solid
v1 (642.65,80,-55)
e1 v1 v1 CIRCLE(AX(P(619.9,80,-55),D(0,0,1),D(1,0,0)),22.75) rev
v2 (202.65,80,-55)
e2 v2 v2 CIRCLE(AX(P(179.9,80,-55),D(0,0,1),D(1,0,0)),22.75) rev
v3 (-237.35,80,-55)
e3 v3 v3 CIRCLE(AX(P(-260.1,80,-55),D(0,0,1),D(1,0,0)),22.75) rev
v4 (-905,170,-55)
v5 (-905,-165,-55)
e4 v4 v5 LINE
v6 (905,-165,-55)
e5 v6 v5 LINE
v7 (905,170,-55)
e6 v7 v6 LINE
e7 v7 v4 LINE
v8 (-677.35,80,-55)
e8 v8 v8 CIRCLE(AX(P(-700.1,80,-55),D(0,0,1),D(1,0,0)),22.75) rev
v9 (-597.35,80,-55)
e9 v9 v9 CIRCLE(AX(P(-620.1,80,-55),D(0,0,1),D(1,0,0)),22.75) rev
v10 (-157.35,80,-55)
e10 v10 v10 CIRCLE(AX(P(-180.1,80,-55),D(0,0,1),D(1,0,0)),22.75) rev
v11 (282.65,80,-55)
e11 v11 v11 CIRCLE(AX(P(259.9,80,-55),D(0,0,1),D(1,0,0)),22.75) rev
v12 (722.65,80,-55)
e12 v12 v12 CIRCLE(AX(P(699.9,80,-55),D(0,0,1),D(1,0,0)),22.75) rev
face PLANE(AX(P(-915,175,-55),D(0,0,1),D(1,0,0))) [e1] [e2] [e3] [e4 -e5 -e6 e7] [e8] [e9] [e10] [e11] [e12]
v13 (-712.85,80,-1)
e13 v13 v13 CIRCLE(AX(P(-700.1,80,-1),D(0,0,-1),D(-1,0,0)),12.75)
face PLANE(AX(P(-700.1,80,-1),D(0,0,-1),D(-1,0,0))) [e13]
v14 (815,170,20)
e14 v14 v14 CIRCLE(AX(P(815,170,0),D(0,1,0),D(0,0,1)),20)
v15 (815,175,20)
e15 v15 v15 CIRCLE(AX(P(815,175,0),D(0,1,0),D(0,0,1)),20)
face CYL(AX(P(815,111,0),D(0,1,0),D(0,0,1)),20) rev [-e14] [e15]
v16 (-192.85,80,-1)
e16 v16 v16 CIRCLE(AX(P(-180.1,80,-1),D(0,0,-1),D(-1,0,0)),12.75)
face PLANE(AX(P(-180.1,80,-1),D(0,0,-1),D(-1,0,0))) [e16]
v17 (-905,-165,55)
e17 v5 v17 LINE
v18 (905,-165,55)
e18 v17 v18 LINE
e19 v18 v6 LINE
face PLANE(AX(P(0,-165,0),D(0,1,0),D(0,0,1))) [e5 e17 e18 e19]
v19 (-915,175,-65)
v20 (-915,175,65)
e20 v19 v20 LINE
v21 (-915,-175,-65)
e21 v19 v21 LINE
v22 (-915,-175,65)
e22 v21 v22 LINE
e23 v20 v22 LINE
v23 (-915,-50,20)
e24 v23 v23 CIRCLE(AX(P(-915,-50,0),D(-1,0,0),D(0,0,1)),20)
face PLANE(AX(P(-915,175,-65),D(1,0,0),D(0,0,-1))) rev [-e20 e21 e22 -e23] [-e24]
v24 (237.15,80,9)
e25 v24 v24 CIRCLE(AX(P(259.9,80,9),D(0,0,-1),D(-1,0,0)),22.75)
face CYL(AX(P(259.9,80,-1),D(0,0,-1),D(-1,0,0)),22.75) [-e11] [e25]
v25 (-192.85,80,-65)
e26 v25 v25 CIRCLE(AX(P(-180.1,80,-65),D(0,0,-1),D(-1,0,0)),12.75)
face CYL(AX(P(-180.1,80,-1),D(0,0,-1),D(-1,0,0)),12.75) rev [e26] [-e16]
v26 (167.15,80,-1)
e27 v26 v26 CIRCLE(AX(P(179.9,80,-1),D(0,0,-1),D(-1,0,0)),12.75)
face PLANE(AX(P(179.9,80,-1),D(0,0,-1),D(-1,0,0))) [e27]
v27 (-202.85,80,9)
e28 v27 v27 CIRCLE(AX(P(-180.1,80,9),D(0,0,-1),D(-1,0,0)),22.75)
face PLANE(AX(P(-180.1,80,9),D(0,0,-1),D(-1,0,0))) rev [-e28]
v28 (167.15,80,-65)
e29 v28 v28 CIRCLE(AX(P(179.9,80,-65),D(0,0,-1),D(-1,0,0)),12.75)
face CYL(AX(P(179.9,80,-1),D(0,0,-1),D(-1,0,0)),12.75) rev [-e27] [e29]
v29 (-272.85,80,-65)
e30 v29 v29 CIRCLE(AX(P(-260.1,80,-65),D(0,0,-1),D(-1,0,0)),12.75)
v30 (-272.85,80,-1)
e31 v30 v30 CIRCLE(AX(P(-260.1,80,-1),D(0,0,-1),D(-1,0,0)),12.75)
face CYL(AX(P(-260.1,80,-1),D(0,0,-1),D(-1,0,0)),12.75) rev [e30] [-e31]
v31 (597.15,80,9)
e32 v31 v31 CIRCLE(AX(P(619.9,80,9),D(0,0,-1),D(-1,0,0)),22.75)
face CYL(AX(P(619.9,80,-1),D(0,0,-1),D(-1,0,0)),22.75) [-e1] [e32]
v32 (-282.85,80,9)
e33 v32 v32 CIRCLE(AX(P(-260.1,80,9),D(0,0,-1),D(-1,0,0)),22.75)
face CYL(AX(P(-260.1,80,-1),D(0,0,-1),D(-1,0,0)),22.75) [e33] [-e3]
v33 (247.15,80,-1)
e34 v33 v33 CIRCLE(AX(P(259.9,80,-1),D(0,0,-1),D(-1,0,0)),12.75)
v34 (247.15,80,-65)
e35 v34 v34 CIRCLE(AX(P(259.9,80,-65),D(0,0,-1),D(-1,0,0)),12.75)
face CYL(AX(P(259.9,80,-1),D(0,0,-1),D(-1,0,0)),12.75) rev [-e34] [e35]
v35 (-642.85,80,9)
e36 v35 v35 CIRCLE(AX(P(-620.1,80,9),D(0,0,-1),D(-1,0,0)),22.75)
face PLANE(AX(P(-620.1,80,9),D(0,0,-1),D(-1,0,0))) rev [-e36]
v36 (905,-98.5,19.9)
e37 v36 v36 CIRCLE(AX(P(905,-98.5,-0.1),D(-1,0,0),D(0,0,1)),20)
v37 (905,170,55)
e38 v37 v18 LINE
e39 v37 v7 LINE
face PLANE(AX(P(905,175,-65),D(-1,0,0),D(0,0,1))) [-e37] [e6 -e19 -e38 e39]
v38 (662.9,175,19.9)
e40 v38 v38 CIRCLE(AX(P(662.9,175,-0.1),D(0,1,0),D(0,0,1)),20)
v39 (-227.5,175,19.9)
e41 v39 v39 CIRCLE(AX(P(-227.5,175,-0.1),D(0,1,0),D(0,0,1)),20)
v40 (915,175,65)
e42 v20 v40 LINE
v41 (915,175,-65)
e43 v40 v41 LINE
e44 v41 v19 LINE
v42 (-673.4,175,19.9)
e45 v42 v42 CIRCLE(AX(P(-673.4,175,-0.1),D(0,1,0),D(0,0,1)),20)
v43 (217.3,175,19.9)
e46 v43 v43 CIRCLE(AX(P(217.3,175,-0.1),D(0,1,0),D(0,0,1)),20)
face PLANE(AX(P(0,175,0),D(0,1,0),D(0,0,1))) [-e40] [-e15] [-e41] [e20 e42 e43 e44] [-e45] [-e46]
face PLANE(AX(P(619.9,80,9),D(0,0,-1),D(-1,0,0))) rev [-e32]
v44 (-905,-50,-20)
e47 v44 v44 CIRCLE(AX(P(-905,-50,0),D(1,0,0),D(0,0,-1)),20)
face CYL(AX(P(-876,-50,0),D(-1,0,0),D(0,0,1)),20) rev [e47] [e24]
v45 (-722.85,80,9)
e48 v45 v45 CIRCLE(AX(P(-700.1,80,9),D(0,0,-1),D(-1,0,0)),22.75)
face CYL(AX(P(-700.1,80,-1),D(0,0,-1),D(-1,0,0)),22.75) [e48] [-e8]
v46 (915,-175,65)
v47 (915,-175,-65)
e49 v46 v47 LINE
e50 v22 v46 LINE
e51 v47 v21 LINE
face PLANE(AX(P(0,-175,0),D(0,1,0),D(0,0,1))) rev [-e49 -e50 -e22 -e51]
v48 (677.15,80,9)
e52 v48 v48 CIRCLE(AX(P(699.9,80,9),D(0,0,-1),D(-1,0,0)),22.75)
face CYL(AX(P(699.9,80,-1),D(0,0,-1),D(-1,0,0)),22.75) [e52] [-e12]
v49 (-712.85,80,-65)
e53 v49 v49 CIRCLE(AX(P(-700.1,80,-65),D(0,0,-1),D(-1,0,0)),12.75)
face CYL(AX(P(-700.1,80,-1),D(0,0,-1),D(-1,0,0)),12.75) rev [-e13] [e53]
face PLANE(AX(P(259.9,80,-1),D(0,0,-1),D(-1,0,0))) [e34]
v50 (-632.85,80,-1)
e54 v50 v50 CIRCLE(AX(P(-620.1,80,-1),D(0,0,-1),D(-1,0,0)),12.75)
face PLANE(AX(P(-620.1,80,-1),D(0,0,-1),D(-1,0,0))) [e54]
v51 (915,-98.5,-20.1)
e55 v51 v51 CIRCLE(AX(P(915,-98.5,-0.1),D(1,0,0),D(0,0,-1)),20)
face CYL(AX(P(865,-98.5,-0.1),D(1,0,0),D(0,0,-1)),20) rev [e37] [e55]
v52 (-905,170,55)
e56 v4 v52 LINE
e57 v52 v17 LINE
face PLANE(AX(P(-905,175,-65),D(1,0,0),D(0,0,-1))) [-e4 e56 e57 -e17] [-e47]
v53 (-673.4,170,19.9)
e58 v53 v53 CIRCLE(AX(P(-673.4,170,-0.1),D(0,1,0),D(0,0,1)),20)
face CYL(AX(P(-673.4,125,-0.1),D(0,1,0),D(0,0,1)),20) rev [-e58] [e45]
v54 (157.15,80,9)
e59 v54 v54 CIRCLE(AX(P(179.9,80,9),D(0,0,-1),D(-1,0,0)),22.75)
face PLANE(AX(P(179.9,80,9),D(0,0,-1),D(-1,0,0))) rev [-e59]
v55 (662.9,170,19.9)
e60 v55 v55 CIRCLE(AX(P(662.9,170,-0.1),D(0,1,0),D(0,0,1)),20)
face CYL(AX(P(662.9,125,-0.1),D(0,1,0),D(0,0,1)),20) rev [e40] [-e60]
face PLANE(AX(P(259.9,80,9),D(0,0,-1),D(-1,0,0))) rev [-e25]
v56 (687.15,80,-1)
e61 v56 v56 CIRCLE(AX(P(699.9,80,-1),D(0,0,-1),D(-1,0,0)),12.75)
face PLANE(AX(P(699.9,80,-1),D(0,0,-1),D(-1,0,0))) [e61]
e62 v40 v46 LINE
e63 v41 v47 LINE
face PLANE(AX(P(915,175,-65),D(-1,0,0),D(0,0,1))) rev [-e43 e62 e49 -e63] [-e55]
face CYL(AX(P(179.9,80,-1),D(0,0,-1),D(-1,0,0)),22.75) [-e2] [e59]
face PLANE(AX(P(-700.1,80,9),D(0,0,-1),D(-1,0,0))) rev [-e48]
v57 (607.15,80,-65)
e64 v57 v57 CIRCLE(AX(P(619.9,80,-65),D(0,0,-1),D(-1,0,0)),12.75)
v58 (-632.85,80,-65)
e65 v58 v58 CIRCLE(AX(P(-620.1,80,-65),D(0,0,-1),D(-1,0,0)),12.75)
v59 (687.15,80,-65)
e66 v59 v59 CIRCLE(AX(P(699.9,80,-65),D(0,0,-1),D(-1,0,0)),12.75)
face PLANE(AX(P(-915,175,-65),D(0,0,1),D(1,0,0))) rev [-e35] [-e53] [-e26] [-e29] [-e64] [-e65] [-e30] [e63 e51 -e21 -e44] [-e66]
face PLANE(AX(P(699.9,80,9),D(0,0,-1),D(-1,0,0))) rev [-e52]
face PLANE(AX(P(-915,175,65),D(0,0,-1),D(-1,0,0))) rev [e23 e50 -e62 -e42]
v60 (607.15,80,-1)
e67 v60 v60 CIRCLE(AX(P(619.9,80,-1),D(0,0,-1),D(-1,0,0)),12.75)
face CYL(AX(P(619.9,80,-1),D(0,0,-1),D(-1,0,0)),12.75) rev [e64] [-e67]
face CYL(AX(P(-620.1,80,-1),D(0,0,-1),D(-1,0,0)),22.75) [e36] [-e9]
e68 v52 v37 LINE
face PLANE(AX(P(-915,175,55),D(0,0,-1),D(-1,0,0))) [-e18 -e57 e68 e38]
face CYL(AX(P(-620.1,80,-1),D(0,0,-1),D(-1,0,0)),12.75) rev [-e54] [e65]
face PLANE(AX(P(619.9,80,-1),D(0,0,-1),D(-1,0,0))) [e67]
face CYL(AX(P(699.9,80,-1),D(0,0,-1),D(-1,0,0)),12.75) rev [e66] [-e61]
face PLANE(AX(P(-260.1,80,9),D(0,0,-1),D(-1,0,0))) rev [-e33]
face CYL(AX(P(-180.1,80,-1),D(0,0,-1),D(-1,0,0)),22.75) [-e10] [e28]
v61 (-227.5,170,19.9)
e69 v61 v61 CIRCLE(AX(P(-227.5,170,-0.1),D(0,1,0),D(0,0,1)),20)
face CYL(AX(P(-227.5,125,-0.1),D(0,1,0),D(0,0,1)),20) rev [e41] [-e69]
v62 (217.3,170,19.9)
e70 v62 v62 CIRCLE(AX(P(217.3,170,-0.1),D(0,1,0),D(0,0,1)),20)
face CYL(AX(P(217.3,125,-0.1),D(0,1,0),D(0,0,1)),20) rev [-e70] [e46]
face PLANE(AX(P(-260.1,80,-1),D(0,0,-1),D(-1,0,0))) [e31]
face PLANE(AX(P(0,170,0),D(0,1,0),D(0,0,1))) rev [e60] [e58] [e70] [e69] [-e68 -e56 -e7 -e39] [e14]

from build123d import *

# Parameters (mm, degrees)
SKETCH1_W           = 1830
SKETCH1_H           = 130
BOSS_EXTRUDE1_DEPTH = 175
SKETCH4_R           = 12.75
CUT_EXTRUDE1_DEPTH  = 64
SHELL1_START        = -55
SHELL1_OUTLINE_W    = 1810
SHELL1_OUTLINE_H    = 335
SHELL1_OUTLINE_R    = 22.75
SHELL1_DEPTH        = 110
SHELL1_START_2      = 9
SHELL1_2_OUTLINE_R  = 22.75
SHELL1_2_DEPTH      = 46
SKETCH5_R           = 20
CUT_EXTRUDE2_DEPTH  = 64
SKETCH6_R           = 20
CUT_EXTRUDE4_DEPTH  = 39
SKETCH7_R           = 20
CUT_EXTRUDE5_DEPTH  = 50
SKETCH9_R           = 20
CUT_EXTRUDE6_DEPTH  = 50


with BuildPart() as part:
    # Sketch1 → Boss-Extrude1 (new, symmetric)
    with BuildSketch(Plane(origin=(0, 0, 0), x_dir=(1, 0, 0), z_dir=(0, 1, 0))):
        Rectangle(SKETCH1_W, SKETCH1_H)
    extrude(amount=BOSS_EXTRUDE1_DEPTH, both=True)

    # Sketch4 → Cut-Extrude1 (cut)
    with BuildSketch(Plane(origin=(0, 0, -65), x_dir=(-1, 0, 0), z_dir=(0, 0, -1))):
        with Locations((-699.9, 80)):
            Circle(SKETCH4_R)
        with Locations((-619.9, 80)):
            Circle(SKETCH4_R)
        with Locations((-259.9, 80)):
            Circle(SKETCH4_R)
        with Locations((-179.9, 80)):
            Circle(SKETCH4_R)
        with Locations((180.1, 80)):
            Circle(SKETCH4_R)
        with Locations((260.1, 80)):
            Circle(SKETCH4_R)
        with Locations((620.1, 80)):
            Circle(SKETCH4_R)
        with Locations((700.1, 80)):
            Circle(SKETCH4_R)
    extrude(amount=-CUT_EXTRUDE1_DEPTH, mode=Mode.SUBTRACT)

    # Shell1: read off the stored shape, not the designer's step
    # Shell1 outline → Shell1 (cut)
    with BuildSketch(Plane.XY.offset(SHELL1_START)):
        with Locations((0, 2.5)):
            Rectangle(SHELL1_OUTLINE_W, SHELL1_OUTLINE_H)
        with Locations((-700.1, 80)):
            Circle(SHELL1_OUTLINE_R, mode=Mode.SUBTRACT)
        with Locations((-620.1, 80)):
            Circle(SHELL1_OUTLINE_R, mode=Mode.SUBTRACT)
        with Locations((-260.1, 80)):
            Circle(SHELL1_OUTLINE_R, mode=Mode.SUBTRACT)
        with Locations((-180.1, 80)):
            Circle(SHELL1_OUTLINE_R, mode=Mode.SUBTRACT)
        with Locations((179.9, 80)):
            Circle(SHELL1_OUTLINE_R, mode=Mode.SUBTRACT)
        with Locations((259.9, 80)):
            Circle(SHELL1_OUTLINE_R, mode=Mode.SUBTRACT)
        with Locations((619.9, 80)):
            Circle(SHELL1_OUTLINE_R, mode=Mode.SUBTRACT)
        with Locations((699.9, 80)):
            Circle(SHELL1_OUTLINE_R, mode=Mode.SUBTRACT)
    extrude(amount=SHELL1_DEPTH, mode=Mode.SUBTRACT)

    # Shell1 2 outline → Shell1 2 (cut)
    with BuildSketch(Plane.XY.offset(SHELL1_START_2)):
        with Locations((-700.1, 80)):
            Circle(SHELL1_2_OUTLINE_R)
        with Locations((-620.1, 80)):
            Circle(SHELL1_2_OUTLINE_R)
        with Locations((-260.1, 80)):
            Circle(SHELL1_2_OUTLINE_R)
        with Locations((-180.1, 80)):
            Circle(SHELL1_2_OUTLINE_R)
        with Locations((179.9, 80)):
            Circle(SHELL1_2_OUTLINE_R)
        with Locations((259.9, 80)):
            Circle(SHELL1_2_OUTLINE_R)
        with Locations((619.9, 80)):
            Circle(SHELL1_2_OUTLINE_R)
        with Locations((699.9, 80)):
            Circle(SHELL1_2_OUTLINE_R)
    extrude(amount=SHELL1_2_DEPTH, mode=Mode.SUBTRACT)

    # Sketch5 → Cut-Extrude2 (cut)
    with BuildSketch(Plane(origin=(0, 175, 0), x_dir=(1, 0, 0), z_dir=(0, 1, 0))):
        with Locations(Location((815, 0, 0), (0, 0, 270))):
            Circle(SKETCH5_R)
    extrude(amount=-CUT_EXTRUDE2_DEPTH, mode=Mode.SUBTRACT)

    # Sketch6 → Cut-Extrude4 (cut)
    with BuildSketch(Plane.ZY.offset(915)):
        with Locations((0, -50)):
            Circle(SKETCH6_R)
    extrude(amount=-CUT_EXTRUDE4_DEPTH, mode=Mode.SUBTRACT)

    # Sketch7 → Cut-Extrude5 (cut)
    with BuildSketch(Plane(origin=(0, 175, 0), x_dir=(1, 0, 0), z_dir=(0, 1, 0))):
        with Locations(Location((662.9, 0.1, 0), (0, 0, 270))):
            Circle(SKETCH7_R)
        with Locations(Location((217.3, 0.1, 0), (0, 0, 270))):
            Circle(SKETCH7_R)
        with Locations(Location((-227.5, 0.1, 0), (0, 0, 270))):
            Circle(SKETCH7_R)
        with Locations(Location((-673.4, 0.1, 0), (0, 0, 270))):
            Circle(SKETCH7_R)
    extrude(amount=-CUT_EXTRUDE5_DEPTH, mode=Mode.SUBTRACT)

    # Sketch9 → Cut-Extrude6 (cut)
    with BuildSketch(Plane(origin=(915, 0, 0), x_dir=(0, 0, -1), z_dir=(1, 0, 0))):
        with Locations((0.1, -98.5)):
            Circle(SKETCH9_R)
    extrude(amount=-CUT_EXTRUDE6_DEPTH, mode=Mode.SUBTRACT)


solid = part.part
